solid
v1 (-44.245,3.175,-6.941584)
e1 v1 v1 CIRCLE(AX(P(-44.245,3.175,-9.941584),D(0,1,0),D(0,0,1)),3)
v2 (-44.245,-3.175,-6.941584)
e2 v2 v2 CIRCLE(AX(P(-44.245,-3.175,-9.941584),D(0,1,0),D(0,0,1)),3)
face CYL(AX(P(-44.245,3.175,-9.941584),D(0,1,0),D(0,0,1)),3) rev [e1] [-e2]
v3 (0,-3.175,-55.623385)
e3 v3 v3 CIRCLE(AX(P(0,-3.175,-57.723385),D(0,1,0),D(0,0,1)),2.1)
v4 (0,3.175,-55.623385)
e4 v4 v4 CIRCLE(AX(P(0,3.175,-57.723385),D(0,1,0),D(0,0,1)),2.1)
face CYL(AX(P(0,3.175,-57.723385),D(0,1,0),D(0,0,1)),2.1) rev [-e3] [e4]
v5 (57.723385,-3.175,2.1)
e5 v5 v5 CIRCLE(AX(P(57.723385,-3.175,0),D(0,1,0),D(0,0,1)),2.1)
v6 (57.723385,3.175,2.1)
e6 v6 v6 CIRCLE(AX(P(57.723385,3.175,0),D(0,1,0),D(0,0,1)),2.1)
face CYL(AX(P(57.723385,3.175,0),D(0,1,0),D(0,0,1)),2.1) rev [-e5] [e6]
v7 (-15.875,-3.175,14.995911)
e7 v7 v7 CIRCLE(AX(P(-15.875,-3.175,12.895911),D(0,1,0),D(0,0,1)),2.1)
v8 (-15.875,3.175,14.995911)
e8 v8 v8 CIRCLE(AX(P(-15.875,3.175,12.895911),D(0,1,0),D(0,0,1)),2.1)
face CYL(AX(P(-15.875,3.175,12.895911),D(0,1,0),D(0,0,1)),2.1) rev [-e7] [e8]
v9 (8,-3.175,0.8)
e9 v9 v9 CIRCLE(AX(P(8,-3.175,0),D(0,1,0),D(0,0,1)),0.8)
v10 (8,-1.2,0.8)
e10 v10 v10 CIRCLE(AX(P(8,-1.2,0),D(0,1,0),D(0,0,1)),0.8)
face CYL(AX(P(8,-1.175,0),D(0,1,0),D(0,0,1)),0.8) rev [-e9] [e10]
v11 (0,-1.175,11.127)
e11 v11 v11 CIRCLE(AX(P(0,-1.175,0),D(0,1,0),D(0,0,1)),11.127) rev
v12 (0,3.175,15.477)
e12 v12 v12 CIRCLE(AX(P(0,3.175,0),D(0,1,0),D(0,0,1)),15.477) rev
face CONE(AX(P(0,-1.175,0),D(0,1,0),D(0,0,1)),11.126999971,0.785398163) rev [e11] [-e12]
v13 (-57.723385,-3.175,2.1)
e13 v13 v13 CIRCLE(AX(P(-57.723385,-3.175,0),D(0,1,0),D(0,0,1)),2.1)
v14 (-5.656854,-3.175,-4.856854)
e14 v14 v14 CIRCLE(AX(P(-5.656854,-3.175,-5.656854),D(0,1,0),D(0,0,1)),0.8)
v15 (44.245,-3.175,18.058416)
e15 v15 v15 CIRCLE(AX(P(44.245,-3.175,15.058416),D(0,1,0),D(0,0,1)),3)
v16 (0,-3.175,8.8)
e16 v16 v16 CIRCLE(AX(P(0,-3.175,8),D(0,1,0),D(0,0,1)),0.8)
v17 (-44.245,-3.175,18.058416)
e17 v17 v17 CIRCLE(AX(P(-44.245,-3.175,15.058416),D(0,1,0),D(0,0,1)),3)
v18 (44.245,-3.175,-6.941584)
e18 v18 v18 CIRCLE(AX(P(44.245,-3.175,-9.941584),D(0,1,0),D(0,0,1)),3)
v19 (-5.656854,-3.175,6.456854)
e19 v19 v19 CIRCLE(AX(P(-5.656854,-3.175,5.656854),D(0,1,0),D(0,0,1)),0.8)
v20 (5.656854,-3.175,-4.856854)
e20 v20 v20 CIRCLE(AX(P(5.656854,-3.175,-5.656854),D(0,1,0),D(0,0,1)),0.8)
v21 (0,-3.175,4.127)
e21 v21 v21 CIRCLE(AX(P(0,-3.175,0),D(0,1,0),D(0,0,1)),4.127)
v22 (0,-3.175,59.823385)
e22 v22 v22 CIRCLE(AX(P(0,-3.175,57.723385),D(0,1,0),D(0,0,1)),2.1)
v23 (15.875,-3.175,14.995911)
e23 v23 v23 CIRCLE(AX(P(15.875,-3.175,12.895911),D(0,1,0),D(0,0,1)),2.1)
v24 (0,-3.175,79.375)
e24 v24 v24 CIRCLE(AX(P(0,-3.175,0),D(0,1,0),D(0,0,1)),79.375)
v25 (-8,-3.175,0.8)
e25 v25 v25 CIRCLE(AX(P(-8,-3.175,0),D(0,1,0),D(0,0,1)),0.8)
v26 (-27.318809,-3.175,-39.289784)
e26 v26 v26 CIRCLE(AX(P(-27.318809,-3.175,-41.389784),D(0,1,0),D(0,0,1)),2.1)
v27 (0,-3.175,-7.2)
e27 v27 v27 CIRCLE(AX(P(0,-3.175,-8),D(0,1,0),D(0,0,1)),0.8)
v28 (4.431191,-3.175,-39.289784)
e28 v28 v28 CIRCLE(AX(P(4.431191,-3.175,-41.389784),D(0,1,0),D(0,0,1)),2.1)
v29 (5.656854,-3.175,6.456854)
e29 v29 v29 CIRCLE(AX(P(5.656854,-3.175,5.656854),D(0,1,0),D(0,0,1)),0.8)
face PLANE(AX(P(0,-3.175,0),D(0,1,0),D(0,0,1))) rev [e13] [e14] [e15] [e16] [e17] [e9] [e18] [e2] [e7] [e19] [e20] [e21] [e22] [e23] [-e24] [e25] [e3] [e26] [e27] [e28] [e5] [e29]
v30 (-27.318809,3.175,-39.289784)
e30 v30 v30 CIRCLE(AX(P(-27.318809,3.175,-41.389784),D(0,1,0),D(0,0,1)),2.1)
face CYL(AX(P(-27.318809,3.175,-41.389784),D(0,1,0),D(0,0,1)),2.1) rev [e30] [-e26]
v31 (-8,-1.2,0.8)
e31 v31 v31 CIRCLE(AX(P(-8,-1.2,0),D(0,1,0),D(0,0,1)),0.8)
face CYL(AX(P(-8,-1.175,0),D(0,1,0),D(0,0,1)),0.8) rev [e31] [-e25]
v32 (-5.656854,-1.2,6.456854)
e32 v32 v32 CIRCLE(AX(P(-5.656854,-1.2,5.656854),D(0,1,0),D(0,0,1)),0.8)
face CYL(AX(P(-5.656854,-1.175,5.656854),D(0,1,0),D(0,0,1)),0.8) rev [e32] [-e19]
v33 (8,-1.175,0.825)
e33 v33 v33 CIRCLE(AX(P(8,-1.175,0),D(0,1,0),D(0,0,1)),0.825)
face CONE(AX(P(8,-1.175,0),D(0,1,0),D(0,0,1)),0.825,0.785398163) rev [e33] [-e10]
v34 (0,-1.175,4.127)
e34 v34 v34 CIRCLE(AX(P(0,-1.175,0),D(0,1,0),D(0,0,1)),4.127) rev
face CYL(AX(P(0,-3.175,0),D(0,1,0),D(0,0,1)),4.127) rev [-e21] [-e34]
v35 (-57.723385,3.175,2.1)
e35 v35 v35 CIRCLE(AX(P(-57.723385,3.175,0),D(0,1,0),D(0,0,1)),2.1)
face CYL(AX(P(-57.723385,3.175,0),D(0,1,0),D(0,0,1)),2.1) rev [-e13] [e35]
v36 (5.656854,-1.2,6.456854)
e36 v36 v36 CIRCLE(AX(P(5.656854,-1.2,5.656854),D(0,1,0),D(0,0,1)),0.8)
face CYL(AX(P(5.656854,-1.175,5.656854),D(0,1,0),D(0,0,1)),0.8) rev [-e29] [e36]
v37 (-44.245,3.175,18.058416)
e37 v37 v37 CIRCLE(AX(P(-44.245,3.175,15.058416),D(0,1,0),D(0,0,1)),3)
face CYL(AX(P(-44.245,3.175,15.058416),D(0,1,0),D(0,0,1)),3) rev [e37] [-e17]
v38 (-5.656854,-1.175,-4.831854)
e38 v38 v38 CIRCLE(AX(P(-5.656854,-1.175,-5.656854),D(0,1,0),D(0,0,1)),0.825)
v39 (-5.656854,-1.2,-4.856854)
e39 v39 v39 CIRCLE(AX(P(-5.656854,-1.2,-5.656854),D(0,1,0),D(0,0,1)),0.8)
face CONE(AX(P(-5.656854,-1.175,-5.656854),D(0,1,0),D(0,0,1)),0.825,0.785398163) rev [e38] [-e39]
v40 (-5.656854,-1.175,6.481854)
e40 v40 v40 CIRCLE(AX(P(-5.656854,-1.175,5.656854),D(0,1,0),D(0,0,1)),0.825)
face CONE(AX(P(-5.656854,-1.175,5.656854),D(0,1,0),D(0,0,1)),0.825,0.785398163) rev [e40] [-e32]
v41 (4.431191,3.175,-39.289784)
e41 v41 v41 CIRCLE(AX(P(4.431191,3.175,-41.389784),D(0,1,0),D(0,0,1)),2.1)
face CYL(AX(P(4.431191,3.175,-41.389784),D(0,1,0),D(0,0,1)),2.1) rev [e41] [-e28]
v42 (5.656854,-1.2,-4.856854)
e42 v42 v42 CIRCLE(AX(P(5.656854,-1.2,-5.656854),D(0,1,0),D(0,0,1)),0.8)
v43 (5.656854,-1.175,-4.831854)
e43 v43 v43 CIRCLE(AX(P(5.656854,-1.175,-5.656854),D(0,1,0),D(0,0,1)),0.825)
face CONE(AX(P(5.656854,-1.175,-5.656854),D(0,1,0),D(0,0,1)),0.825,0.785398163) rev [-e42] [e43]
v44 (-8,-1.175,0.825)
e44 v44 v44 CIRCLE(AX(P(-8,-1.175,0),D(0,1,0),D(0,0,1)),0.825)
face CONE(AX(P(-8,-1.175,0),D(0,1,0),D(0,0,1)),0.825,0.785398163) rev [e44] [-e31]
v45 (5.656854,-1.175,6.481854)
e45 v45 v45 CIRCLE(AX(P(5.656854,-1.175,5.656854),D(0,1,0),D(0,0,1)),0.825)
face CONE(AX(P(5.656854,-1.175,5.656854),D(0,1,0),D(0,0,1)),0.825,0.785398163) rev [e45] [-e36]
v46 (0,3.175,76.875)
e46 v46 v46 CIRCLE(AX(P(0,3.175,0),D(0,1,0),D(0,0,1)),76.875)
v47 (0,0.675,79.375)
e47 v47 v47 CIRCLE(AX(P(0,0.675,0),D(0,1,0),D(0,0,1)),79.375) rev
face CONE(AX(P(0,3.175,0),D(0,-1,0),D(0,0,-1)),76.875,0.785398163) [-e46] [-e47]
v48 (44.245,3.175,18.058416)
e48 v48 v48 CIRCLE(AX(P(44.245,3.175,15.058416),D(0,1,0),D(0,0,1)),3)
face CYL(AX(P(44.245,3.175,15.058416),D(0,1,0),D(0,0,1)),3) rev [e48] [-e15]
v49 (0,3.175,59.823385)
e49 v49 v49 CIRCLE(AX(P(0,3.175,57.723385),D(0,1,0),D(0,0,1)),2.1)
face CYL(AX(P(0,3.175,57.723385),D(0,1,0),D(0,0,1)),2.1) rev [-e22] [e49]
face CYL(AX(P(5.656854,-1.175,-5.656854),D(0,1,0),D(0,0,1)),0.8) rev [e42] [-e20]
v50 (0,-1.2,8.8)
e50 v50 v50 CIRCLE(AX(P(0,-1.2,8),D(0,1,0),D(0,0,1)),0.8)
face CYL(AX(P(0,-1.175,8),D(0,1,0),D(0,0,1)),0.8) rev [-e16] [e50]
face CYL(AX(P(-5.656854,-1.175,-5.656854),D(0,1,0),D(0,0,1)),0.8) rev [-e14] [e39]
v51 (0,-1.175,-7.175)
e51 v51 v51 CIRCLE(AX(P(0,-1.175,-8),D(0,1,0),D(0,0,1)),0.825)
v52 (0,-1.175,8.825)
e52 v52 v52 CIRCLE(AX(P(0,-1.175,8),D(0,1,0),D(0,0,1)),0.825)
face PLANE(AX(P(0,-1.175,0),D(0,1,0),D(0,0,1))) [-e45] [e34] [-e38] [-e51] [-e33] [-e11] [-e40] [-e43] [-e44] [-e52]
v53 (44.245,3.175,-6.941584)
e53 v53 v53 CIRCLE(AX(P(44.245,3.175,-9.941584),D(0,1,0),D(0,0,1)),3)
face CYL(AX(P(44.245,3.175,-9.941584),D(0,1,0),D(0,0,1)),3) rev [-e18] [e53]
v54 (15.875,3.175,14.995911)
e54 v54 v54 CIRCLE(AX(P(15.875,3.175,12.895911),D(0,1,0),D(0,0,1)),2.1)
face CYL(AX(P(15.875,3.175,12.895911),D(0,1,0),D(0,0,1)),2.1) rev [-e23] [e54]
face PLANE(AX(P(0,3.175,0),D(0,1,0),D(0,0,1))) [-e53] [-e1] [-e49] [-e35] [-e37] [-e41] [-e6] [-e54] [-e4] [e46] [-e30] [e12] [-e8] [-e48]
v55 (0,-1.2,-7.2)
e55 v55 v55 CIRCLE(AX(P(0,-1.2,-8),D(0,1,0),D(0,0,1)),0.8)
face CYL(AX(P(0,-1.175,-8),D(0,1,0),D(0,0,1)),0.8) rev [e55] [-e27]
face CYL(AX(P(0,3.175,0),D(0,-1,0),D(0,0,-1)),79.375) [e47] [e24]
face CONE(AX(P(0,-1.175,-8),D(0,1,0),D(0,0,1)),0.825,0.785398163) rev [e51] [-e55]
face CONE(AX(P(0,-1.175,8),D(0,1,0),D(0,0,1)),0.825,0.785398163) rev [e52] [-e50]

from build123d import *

# Parameters (mm, degrees)
SKETCH1_R                             = 79.375
BOSS_EXTRUDE1_DEPTH                   = 3.175
TAP_DRILL_FOR_M5X0_8_TAP1_D           = 4.2
TAP_DRILL_FOR_M7X1_0_TAP1_D           = 6
SKETCH32_R                            = 4.127000001
CUT_EXTRUDE1_DEPTH                    = 113.432663181
SKETCH32_4_R                          = 11.126999971
SKETCH32_4_R_2                        = 4.127000001
CUT_EXTRUDE2_DEPTH                    = 4.35
CHAMFER1_SIZE                         = 4.35
TAP_DRILL_FOR_M2X0_4_TAP1_D           = 1.6
TAP_DRILL_FOR_M2X0_4_TAP1_CSINK_D     = 1.65
TAP_DRILL_FOR_M2X0_4_TAP1_CSINK_ANGLE = 90
CHAMFER2_SIZE                         = 2.5
TAP_DRILL_FOR_M5X0_8_TAP2_D           = 4.2


with BuildPart() as part:
    # Sketch1 → Boss-Extrude1 (new, symmetric)
    with BuildSketch(Plane(origin=(0, 0, 0), x_dir=(1, 0, 0), z_dir=(0, 1, 0))):
        with Locations(Location((0, 0, 0), (0, 0, 270))):
            Circle(SKETCH1_R)
    extrude(amount=BOSS_EXTRUDE1_DEPTH, both=True)

    # Tap Drill for M5x0.8 Tap1 (through all)
    with Locations(Plane(origin=(0, 3.175, 0), x_dir=(1, 0, 0), z_dir=(0, 1, 0))):
        with Locations((-27.3188086, 41.38978387), (4.4311914, 41.38978387), (-15.875, -12.895910708), (15.875, -12.895910708)):
            Hole(TAP_DRILL_FOR_M5X0_8_TAP1_D / 2)

    # Tap Drill for M7x1.0 Tap1 (through all)
    with Locations(Plane(origin=(0, 3.175, 0), x_dir=(1, 0, 0), z_dir=(0, 1, 0))):
        with Locations((-44.245, 9.941583672), (-44.245, -15.058416328), (44.245, 9.941583672), (44.245, -15.058416328)):
            Hole(TAP_DRILL_FOR_M7X1_0_TAP1_D / 2)

    # Sketch32 → Cut-Extrude1 (cut, through all)
    with BuildSketch(Plane(origin=(0, 3.175, 0), x_dir=(1, 0, 0), z_dir=(0, 1, 0))):
        with Locations(Location((0, 0, 0), (0, 0, 270))):
            Circle(SKETCH32_R)
    extrude(amount=-CUT_EXTRUDE1_DEPTH, mode=Mode.SUBTRACT)

    # Sketch32<4> → Cut-Extrude2 (cut)
    with BuildSketch(Plane(origin=(0, 3.175, 0), x_dir=(1, 0, 0), z_dir=(0, 1, 0))):
        with Locations(Location((0, 0, 0), (0, 0, 270))):
            Circle(SKETCH32_4_R)
        with Locations(Location((0, 0, 0), (0, 0, 270))):
            Circle(SKETCH32_4_R_2, mode=Mode.SUBTRACT)
    extrude(amount=-CUT_EXTRUDE2_DEPTH, mode=Mode.SUBTRACT)

    # Chamfer1
    chamfer1_edges = [part.edges().sort_by_distance(p)[0] for p in [
        (0, 3.175, -11.126999971),
    ]]
    chamfer(chamfer1_edges, length=CHAMFER1_SIZE - 0.0001)  # a hair under: the kernel refuses the full size

    # Tap Drill for M2x0.4 Tap1 (through all)
    with Locations(Plane(origin=(0, -1.175, 0), x_dir=(1, 0, 0), z_dir=(0, 1, 0))):
        with Locations((-8, 0), (-5.656854249, 5.656854249), (0, 8), (5.656854249, 5.656854249), (8, 0), (5.656854249, -5.656854249), (0, -8), (-5.656854249, -5.656854249)):
            CounterSinkHole(TAP_DRILL_FOR_M2X0_4_TAP1_D / 2, TAP_DRILL_FOR_M2X0_4_TAP1_CSINK_D / 2, counter_sink_angle=TAP_DRILL_FOR_M2X0_4_TAP1_CSINK_ANGLE)

    # Chamfer2
    chamfer2_edges = [part.edges().sort_by_distance(p)[0] for p in [
        (0, 3.175, -79.375),
    ]]
    chamfer(chamfer2_edges, length=CHAMFER2_SIZE)

    # Tap Drill for M5x0.8 Tap2 (through all)
    with Locations(Plane(origin=(0, 3.175, 0), x_dir=(1, 0, 0), z_dir=(0, 1, 0))):
        with Locations((-57.723385101, 0), (0, 57.723385101), (57.723385101, 0), (0, -57.723385101)):
            Hole(TAP_DRILL_FOR_M5X0_8_TAP2_D / 2)


solid = part.part
